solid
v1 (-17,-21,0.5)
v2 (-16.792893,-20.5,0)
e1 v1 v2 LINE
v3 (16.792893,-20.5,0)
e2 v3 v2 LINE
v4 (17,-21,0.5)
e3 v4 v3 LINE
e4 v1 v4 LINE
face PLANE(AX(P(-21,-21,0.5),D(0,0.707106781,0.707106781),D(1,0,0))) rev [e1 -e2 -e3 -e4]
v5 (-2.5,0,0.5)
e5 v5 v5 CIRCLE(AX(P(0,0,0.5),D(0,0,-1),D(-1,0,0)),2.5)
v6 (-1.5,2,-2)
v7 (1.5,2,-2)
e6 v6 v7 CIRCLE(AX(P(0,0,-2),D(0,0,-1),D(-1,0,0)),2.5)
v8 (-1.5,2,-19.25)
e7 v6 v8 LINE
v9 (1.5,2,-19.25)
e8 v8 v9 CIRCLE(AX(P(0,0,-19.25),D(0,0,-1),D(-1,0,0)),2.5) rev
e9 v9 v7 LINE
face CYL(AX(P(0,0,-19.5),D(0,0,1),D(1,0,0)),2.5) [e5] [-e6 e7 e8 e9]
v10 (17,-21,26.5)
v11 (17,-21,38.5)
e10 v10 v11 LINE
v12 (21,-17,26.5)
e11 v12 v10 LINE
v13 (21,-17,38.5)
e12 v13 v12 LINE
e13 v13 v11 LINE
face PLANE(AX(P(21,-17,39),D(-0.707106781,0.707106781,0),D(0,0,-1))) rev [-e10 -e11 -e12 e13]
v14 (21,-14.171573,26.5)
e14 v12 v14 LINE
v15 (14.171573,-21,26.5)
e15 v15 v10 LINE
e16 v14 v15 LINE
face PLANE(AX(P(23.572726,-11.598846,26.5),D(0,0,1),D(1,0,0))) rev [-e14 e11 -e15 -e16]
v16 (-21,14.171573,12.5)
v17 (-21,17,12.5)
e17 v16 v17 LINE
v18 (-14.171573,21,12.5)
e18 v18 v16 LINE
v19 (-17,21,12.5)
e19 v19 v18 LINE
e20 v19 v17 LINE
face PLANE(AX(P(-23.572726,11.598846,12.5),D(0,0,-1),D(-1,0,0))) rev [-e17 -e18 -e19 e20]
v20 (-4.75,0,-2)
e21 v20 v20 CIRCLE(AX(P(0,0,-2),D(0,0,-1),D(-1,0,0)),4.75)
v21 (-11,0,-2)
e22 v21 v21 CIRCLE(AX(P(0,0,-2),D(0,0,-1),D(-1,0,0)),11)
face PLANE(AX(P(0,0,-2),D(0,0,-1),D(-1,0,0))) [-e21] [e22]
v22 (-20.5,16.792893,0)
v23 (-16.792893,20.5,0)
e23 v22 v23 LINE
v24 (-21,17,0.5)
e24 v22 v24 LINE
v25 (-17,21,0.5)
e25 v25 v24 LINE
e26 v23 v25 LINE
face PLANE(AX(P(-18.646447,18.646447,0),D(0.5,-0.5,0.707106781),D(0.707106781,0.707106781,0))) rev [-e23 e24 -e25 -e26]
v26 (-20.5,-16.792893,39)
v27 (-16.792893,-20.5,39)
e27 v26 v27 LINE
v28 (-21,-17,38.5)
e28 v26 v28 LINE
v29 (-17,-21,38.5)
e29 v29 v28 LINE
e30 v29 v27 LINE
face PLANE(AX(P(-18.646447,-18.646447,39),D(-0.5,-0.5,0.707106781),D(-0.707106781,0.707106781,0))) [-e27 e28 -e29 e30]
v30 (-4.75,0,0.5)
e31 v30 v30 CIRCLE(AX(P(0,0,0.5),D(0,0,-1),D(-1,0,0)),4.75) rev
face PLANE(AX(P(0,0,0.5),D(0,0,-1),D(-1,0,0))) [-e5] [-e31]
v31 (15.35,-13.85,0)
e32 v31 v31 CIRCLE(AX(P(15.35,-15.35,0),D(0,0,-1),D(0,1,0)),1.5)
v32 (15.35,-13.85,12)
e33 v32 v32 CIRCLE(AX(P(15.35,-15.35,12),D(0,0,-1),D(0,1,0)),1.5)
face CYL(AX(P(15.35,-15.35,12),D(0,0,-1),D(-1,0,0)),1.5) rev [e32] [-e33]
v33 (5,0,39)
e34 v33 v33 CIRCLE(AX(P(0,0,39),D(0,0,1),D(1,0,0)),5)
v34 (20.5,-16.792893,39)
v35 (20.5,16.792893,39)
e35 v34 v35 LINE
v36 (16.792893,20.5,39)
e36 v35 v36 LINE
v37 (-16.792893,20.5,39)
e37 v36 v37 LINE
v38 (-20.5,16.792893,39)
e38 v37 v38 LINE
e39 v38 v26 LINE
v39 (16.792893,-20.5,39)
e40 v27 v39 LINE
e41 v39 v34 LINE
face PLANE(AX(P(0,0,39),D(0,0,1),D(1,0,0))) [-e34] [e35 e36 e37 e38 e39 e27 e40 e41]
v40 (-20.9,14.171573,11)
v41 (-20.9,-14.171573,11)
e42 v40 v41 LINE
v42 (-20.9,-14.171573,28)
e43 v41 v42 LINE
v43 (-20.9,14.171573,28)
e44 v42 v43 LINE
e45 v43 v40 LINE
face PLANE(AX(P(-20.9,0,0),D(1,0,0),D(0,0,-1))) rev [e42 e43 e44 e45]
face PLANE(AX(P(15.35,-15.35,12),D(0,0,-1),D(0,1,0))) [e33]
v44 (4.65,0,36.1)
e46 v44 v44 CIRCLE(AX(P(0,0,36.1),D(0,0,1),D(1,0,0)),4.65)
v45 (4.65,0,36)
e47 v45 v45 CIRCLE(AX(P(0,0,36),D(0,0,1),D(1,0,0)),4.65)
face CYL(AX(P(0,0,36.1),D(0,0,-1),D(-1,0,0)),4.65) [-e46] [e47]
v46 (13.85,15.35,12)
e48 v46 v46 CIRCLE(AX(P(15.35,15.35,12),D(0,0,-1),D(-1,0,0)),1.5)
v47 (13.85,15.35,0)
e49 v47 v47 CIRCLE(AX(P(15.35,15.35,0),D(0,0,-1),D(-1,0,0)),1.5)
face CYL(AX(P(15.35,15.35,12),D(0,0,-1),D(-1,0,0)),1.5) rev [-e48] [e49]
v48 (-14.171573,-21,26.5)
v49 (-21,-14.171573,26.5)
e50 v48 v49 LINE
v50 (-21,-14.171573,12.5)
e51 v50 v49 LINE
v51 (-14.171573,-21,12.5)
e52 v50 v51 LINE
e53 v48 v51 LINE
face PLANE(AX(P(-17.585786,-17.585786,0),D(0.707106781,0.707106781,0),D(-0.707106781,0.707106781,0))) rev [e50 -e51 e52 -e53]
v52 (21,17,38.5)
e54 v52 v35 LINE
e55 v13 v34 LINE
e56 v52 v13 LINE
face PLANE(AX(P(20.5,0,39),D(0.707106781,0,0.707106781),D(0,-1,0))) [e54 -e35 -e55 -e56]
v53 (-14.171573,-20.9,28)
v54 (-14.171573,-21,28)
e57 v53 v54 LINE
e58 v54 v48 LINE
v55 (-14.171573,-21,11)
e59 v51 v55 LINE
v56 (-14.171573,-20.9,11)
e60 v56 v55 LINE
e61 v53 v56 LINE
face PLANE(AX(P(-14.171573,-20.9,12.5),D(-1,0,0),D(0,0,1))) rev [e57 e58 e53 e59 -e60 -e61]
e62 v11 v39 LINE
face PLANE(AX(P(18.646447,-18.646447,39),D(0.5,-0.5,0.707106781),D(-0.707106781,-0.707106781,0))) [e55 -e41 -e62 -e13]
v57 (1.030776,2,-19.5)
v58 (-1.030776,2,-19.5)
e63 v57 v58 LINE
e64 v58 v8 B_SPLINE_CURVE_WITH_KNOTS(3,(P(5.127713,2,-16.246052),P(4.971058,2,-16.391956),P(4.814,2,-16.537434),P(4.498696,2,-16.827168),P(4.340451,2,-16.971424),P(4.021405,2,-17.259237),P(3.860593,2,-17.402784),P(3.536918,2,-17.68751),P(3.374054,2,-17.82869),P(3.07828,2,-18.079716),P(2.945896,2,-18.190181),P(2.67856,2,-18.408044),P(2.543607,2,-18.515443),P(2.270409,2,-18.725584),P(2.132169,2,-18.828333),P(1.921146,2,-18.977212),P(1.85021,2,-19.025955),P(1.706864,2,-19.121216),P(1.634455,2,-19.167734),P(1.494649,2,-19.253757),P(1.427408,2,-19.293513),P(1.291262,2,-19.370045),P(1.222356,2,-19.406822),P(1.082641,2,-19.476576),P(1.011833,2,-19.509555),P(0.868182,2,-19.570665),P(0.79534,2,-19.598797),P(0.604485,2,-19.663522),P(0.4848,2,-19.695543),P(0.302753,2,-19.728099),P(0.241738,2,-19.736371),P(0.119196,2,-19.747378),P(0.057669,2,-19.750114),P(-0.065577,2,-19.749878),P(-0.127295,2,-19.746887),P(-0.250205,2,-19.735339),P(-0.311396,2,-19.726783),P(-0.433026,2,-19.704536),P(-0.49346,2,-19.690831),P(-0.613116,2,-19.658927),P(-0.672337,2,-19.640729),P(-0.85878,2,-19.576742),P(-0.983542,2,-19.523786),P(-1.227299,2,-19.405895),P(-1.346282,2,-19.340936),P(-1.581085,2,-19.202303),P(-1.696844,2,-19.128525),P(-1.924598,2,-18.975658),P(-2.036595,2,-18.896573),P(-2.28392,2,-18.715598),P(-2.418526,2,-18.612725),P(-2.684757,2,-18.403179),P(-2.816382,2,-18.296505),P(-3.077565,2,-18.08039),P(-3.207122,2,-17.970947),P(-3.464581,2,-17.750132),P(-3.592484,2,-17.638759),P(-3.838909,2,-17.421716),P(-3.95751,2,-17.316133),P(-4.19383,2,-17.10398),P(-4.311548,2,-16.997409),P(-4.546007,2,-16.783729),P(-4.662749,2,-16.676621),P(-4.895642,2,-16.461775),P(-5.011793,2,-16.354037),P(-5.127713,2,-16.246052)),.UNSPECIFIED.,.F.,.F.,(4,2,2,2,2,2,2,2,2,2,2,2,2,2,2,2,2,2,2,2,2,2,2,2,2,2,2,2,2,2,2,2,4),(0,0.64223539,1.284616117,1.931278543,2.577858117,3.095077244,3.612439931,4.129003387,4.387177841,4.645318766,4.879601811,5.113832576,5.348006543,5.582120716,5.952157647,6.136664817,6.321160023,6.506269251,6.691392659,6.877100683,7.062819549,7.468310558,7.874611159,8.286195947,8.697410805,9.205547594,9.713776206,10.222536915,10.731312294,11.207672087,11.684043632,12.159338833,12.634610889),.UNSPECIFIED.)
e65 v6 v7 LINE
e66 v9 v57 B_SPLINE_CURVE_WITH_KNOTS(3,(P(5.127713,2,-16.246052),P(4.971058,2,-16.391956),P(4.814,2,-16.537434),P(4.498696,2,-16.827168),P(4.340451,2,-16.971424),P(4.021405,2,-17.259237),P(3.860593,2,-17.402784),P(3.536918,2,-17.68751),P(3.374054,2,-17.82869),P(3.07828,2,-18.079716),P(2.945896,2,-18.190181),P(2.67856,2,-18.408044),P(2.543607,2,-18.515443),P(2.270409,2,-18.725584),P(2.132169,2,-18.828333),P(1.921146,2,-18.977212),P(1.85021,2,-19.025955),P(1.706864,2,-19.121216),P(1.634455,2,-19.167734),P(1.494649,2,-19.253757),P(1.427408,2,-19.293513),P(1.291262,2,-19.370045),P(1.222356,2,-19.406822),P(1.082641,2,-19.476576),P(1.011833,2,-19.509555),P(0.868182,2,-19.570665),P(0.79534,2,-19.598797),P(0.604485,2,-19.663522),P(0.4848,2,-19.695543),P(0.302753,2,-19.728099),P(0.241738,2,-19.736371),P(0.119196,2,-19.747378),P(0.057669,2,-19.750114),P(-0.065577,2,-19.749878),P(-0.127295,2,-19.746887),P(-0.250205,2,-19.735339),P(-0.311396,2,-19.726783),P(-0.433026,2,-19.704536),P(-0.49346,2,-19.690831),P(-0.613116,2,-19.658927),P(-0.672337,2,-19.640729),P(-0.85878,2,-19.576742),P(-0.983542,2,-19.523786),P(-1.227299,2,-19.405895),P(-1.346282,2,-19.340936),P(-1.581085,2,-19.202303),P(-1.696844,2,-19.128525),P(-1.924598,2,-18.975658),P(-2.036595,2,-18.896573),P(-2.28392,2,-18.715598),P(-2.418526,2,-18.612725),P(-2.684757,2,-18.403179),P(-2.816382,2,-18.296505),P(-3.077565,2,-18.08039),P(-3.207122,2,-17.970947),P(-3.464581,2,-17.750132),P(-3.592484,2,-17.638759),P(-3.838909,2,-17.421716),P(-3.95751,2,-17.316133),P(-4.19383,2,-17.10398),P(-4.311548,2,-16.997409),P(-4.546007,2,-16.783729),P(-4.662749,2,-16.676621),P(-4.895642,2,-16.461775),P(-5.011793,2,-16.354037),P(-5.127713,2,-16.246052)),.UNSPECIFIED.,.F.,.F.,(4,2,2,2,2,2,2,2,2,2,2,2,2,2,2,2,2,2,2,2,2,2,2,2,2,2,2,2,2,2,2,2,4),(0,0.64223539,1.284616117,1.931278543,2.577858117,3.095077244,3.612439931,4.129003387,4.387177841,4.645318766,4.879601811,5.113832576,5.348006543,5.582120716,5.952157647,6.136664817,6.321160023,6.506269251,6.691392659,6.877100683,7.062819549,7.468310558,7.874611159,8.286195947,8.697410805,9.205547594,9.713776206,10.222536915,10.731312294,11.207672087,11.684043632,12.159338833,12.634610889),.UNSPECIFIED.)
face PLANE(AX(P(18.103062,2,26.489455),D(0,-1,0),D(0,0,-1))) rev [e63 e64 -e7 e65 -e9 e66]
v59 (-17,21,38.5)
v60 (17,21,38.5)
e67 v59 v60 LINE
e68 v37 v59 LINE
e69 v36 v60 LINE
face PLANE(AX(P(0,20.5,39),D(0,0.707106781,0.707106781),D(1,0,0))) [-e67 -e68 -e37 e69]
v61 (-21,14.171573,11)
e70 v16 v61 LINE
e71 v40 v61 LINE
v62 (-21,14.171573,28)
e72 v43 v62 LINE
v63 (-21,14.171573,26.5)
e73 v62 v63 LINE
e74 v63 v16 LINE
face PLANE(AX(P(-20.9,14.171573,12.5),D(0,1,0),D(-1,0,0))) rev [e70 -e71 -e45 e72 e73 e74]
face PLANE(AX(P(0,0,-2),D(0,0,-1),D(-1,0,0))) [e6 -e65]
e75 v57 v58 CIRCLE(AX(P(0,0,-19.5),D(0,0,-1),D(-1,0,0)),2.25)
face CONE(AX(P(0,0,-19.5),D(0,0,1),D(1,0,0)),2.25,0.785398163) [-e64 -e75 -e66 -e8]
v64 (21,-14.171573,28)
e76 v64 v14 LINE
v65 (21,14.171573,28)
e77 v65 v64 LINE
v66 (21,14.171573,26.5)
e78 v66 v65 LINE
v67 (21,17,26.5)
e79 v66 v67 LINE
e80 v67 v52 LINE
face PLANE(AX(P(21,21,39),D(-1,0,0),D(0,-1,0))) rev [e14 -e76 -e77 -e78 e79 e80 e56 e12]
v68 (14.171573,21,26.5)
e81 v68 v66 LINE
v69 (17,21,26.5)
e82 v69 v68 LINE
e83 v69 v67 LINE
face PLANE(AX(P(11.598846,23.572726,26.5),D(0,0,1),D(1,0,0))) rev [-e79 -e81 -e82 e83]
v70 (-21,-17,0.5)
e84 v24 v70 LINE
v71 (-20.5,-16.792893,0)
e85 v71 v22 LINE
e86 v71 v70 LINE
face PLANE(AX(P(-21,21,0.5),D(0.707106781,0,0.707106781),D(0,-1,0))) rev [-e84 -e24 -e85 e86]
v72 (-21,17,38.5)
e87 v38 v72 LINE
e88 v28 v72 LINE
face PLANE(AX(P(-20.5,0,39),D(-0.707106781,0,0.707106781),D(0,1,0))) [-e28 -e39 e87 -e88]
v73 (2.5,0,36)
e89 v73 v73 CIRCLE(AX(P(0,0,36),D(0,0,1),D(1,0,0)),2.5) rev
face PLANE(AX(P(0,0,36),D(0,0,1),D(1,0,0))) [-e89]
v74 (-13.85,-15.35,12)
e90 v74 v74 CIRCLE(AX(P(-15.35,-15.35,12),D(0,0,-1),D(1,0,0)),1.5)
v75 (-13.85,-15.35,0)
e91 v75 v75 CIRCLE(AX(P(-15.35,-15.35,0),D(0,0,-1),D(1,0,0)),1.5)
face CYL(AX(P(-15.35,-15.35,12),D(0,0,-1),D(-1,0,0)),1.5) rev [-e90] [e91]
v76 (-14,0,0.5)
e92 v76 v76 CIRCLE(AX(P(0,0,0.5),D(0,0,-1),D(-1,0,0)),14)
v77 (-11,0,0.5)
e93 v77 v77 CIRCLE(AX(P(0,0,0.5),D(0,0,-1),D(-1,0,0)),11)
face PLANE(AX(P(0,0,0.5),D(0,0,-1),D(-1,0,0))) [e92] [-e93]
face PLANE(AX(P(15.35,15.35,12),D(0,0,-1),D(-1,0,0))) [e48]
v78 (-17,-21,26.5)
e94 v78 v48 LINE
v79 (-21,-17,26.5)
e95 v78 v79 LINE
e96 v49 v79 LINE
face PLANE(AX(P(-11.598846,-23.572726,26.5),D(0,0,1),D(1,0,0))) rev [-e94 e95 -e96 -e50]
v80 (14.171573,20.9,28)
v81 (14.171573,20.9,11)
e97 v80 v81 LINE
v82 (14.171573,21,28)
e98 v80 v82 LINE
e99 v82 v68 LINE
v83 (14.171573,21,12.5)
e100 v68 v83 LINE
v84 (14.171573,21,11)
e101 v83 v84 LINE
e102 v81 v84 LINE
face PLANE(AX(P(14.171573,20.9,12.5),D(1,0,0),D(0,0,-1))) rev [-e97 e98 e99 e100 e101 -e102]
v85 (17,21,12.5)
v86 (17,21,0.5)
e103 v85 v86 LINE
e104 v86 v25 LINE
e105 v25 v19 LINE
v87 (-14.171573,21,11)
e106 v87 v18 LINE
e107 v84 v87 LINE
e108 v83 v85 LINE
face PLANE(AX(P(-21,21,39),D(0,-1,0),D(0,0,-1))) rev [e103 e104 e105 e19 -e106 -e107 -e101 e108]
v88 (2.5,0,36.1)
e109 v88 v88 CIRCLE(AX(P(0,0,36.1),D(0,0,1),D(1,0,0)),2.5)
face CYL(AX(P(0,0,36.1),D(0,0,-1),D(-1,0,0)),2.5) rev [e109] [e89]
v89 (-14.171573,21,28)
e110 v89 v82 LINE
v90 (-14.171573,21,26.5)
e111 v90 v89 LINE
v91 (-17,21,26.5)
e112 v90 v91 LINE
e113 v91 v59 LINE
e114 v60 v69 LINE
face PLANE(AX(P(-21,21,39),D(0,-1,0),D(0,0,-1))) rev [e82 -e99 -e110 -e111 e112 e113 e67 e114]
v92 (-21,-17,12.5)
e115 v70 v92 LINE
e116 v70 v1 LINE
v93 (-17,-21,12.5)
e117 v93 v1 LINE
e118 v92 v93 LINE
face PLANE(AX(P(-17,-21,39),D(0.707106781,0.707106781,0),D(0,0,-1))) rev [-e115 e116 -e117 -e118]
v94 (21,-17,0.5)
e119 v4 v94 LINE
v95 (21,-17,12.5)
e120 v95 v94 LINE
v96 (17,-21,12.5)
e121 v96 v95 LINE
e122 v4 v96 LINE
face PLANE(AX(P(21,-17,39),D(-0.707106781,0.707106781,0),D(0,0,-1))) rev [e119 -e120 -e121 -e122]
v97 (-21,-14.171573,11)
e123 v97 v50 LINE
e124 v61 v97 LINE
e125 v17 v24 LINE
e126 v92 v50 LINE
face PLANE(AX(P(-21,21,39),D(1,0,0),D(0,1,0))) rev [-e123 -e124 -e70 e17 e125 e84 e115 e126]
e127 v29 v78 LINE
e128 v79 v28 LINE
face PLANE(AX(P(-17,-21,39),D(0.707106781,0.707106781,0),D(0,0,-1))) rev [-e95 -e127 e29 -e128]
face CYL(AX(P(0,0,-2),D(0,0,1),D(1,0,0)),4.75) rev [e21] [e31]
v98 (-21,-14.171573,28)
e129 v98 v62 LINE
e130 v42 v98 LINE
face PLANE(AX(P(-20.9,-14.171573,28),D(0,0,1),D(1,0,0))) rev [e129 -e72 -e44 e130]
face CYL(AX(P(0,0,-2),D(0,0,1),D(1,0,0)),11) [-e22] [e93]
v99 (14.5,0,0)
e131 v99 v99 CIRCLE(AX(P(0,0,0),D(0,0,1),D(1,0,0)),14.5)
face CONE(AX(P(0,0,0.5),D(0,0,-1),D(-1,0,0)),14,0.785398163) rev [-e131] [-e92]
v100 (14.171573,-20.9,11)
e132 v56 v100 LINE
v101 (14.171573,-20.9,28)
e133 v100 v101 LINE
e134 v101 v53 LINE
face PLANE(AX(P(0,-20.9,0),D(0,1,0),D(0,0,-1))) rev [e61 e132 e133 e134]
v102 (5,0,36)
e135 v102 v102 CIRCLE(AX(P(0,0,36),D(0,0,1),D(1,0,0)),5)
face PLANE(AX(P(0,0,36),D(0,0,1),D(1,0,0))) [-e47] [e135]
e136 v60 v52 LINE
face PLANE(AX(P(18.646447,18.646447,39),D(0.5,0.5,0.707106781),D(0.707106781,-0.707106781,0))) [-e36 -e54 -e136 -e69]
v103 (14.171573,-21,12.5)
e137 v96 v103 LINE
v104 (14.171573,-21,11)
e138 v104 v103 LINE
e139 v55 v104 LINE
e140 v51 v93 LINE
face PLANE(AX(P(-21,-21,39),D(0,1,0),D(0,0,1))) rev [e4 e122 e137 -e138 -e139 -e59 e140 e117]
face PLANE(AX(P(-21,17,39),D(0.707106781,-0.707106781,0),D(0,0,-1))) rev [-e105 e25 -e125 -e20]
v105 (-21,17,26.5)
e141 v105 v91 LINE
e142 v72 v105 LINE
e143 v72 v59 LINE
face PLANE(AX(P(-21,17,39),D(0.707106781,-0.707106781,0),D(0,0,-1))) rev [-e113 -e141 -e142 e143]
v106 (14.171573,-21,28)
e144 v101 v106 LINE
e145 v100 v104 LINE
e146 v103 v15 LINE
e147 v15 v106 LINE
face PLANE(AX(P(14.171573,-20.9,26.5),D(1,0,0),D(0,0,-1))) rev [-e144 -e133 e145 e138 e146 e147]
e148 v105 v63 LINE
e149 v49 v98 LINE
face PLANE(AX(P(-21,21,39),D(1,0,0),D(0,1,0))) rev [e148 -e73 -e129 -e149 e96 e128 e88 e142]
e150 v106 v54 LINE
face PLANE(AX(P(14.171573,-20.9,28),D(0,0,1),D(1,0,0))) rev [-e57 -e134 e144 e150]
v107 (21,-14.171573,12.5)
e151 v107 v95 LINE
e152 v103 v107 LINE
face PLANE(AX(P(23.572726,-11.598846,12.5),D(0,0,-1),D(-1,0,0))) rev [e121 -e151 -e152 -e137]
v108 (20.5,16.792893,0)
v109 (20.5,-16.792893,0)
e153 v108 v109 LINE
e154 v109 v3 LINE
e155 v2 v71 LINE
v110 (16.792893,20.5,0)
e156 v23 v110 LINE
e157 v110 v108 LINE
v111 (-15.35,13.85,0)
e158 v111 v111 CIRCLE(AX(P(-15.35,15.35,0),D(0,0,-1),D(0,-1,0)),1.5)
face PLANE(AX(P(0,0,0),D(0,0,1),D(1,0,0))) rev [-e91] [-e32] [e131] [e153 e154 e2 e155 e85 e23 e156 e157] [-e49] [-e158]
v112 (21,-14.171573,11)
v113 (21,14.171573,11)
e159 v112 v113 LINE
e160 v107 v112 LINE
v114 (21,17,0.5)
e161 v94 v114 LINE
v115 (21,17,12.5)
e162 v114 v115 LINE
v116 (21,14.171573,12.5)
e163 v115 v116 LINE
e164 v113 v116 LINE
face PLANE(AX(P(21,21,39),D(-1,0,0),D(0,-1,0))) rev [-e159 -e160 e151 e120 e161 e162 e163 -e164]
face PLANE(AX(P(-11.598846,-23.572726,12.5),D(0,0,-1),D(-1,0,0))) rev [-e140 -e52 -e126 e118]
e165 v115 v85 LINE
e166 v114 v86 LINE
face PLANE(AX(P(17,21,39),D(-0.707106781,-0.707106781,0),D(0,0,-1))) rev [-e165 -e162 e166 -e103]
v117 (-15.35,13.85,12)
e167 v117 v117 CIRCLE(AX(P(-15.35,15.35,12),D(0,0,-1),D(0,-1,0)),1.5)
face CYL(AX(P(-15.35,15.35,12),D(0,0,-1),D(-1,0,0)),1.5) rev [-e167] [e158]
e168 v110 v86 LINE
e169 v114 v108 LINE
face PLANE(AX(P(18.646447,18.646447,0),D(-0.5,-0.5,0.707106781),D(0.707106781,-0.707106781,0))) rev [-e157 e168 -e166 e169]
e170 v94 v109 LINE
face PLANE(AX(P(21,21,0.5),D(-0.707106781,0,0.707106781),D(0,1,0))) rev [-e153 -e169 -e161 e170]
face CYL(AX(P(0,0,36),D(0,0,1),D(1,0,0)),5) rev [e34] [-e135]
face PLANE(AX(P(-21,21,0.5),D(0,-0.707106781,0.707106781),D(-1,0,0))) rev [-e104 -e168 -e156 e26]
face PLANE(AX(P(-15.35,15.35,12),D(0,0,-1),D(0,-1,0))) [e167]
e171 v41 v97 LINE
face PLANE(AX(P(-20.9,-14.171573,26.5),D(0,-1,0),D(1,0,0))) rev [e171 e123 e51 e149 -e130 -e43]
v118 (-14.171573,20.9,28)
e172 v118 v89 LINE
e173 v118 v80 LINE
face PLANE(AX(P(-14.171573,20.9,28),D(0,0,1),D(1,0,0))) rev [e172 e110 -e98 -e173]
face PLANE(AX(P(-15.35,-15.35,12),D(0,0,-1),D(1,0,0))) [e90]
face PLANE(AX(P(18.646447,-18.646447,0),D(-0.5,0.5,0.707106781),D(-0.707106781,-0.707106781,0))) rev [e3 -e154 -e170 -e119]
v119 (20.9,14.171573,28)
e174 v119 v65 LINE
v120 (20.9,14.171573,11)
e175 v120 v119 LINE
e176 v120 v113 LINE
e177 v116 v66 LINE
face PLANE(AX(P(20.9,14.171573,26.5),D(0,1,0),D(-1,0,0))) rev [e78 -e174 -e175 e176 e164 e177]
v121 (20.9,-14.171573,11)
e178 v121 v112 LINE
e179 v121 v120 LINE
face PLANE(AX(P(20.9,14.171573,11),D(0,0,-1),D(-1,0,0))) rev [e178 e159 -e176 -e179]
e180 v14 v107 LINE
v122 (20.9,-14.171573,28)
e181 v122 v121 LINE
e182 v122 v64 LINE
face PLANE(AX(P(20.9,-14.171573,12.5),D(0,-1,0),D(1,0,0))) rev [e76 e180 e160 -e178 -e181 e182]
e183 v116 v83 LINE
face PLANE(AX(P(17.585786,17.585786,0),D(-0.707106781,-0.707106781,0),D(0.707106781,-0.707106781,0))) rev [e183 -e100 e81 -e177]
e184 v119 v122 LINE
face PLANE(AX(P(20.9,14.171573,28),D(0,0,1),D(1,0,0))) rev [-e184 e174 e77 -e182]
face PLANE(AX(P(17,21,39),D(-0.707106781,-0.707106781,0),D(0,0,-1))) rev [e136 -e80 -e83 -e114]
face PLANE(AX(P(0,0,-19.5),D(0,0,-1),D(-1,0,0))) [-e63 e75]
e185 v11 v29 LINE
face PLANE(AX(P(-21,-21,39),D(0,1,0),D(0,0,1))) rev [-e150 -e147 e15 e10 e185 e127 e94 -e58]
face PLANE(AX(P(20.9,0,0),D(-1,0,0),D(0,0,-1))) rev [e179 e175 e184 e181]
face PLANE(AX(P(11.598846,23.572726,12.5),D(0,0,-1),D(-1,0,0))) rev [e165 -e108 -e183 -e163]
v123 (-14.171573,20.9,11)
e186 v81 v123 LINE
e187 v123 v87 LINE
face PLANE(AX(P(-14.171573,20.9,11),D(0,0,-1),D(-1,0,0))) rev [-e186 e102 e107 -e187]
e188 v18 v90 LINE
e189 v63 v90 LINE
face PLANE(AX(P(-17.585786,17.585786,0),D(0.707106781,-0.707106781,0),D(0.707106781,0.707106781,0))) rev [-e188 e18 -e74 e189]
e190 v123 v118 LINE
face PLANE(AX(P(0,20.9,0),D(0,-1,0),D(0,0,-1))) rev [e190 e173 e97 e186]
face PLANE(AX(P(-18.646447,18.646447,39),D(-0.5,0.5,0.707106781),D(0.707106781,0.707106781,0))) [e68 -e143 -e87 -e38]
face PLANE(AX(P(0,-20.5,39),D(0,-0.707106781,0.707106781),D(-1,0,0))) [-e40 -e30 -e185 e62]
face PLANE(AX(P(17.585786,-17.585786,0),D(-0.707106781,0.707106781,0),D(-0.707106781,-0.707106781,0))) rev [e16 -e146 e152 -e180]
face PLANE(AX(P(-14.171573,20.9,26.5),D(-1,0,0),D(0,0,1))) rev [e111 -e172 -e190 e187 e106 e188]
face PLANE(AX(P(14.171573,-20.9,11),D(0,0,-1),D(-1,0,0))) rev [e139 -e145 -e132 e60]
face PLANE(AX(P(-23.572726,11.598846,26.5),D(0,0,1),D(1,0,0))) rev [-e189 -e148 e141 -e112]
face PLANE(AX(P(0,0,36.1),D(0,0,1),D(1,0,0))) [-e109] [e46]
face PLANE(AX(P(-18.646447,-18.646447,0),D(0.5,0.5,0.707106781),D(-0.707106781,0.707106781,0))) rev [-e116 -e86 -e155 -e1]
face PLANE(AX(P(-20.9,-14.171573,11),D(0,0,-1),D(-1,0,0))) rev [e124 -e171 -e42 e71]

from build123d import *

# Parameters (mm, degrees)
CROQUIS1_W              = 42
CROQUIS1_H              = 42
SALIENTE_EXTRUIR1_DEPTH = 39
CHAFL_N2_SIZE           = 4
CHAFL_N3_SIZE           = 0.5
CROQUIS2_R              = 15
CORTAR_EXTRUIR2_DEPTH   = 0.5
CHAFL_N4_SIZE           = 1
CROQUIS3_R              = 11
CROQUIS3_R_2            = 4.75
SALIENTE_EXTRUIR2_DEPTH = 2.5
CROQUIS4_R              = 2.5
SALIENTE_EXTRUIR3_DEPTH = 20
CHAFL_N5_SIZE           = 0.25
CROQUIS5_W              = 26.553784045
CROQUIS5_H              = 10.322094095
CORTAR_EXTRUIR3_DEPTH   = 17.5
CROQUIS6_R              = 1.5
CORTAR_EXTRUIR4_DEPTH   = 12
MATRIZC1_COUNT          = 4
CROQUIS7_W              = 14
CROQUIS7_H              = 16.933623344
CORTAR_EXTRUIR5_DEPTH   = 2
MATRIZC2_COUNT          = 4
CORTAR_EXTRUIR6_DEPTH   = 0.1
MATRIZC3_COUNT          = 4
CROQUIS9_R              = 5
CORTAR_EXTRUIR7_DEPTH   = 3
SALIENTE_EXTRUIR4_START = 0.1
CROQUIS10_R             = 4.65
CROQUIS10_R_2           = 2.5
SALIENTE_EXTRUIR4_DEPTH = 0.1


with BuildPart() as part:
    # Croquis1 → Saliente-Extruir1 (new body)
    with BuildSketch(Plane.XY):
        Rectangle(CROQUIS1_W, CROQUIS1_H)
    extrude(amount=SALIENTE_EXTRUIR1_DEPTH)

    # Chaflán2
    chafl_n2_edges = [part.edges().sort_by_distance(p)[0] for p in [
        (21, -21, 19.5),
        (-21, -21, 19.5),
        (-21, 21, 19.5),
        (21, 21, 19.5),
    ]]
    chamfer(chafl_n2_edges, length=CHAFL_N2_SIZE)

    # Chaflán3
    chafl_n3_edges = [part.edges().sort_by_distance(p)[0] for p in [
        (21, 0, 0),
        (21, 0, 39),
        (0, -21, 0),
        (-21, 0, 0),
        (0, 21, 0),
        (-19, -19, 0),
        (-19, 19, 0),
        (19, 19, 0),
        (19, -19, 0),
        (0, -21, 39),
        (0, 21, 39),
        (-21, 0, 39),
        (-19, -19, 39),
        (-19, 19, 39),
        (19, 19, 39),
        (19, -19, 39),
    ]]
    chamfer(chafl_n3_edges, length=CHAFL_N3_SIZE)

    # Croquis2 → Cortar-Extruir2 (cut)
    with BuildSketch(Plane(origin=(0, 0, 0), x_dir=(-1, 0, 0), z_dir=(0, 0, -1))):
        Circle(CROQUIS2_R)
    extrude(amount=-CORTAR_EXTRUIR2_DEPTH, mode=Mode.SUBTRACT)

    # Chaflán4
    # the kernel refuses this chamfer: 1 mm, written as the material it adds along each edge
    with BuildSketch(Plane(origin=(0, 0, 0.5), x_dir=(-1, 0, 0), z_dir=(0, -1, 0))) as chafl_n4_piece_1_section:
        Polygon((15, CHAFL_N4_SIZE), (15 - CHAFL_N4_SIZE, 0), (15, 0), align=None)
    chafl_n4_piece_1 = revolve(axis=Axis((0, 0, 0.5), (0, 0, -1)), mode=Mode.PRIVATE)
    chafl_n4_piece_1 = split(chafl_n4_piece_1, bisect_by=Plane(origin=(14.259533629, 0, 0), z_dir=(0, 0, 1)), keep=Keep.TOP, mode=Mode.PRIVATE)
    add(chafl_n4_piece_1)

    # Croquis3 → Saliente-Extruir2 (add)
    with BuildSketch(Plane(origin=(0, 0, 0.5), x_dir=(-1, 0, 0), z_dir=(0, 0, -1))):
        Circle(CROQUIS3_R)
        Circle(CROQUIS3_R_2, mode=Mode.SUBTRACT)
    extrude(amount=SALIENTE_EXTRUIR2_DEPTH)

    # Croquis4 → Saliente-Extruir3 (add)
    with BuildSketch(Plane(origin=(0, 0, 0.5), x_dir=(-1, 0, 0), z_dir=(0, 0, -1))):
        Circle(CROQUIS4_R)
    extrude(amount=SALIENTE_EXTRUIR3_DEPTH)

    # Chaflán5
    chafl_n5_edges = [part.edges().sort_by_distance(p)[0] for p in [
        (2.5, 0, -19.5),
    ]]
    chamfer(chafl_n5_edges, length=CHAFL_N5_SIZE)

    # Croquis5 → Cortar-Extruir3 (cut)
    with BuildSketch(Plane(origin=(0, 0, -19.5), x_dir=(-1, 0, 0), z_dir=(0, 0, -1))):
        with Locations((-4.826169949, 7.161047048)):
            Rectangle(CROQUIS5_W, CROQUIS5_H)
    extrude(amount=-CORTAR_EXTRUIR3_DEPTH, mode=Mode.SUBTRACT)

    # Croquis6 → Cortar-Extruir4 (cut)
    with BuildSketch(Plane(origin=(0, 0, 0), x_dir=(-1, 0, 0), z_dir=(0, 0, -1))):
        with Locations((-15.35, 15.35)):
            Circle(CROQUIS6_R)
    cortar_extruir4 = extrude(amount=-CORTAR_EXTRUIR4_DEPTH, mode=Mode.SUBTRACT)

    # MatrizC1: Cortar-Extruir4 ×4 about axis
    matrizc1_axis = Axis((0, 0, 0), (0, 0, 1))
    for i in range(1, MATRIZC1_COUNT):
        add(cortar_extruir4.rotate(matrizc1_axis, i * 360 / MATRIZC1_COUNT), mode=Mode.SUBTRACT)

    # Croquis7 → Cortar-Extruir5 (cut)
    with BuildSketch(Plane(origin=(-19, -19, 0), x_dir=(0, 0, 1), z_dir=(-0.7071067811865487, -0.7071067811865465, 0))):
        with Locations((19.5, 0)):
            Rectangle(CROQUIS7_W, CROQUIS7_H)
    cortar_extruir5 = extrude(amount=-CORTAR_EXTRUIR5_DEPTH, mode=Mode.SUBTRACT)

    # MatrizC2: Cortar-Extruir5 ×4 about axis
    matrizc2_axis = Axis((0, 0, 0), (0, 0, 1))
    for i in range(1, MATRIZC2_COUNT):
        add(cortar_extruir5.rotate(matrizc2_axis, i * 360 / MATRIZC2_COUNT), mode=Mode.SUBTRACT)

    # Croquis8 → Cortar-Extruir6 (cut)
    with BuildSketch(Plane(origin=(0, 21, 0), x_dir=(1, 0, 0), z_dir=(0, 1, 0))):
        Polygon((-14.171572875, -12.5), (-14.171572875, -26.5), (-14.171572875, -28), (14.171572875, -28), (14.171572875, -26.5), (14.171572875, -12.5), (14.171572875, -11), (-14.171572875, -11), align=None)
    cortar_extruir6 = extrude(amount=-CORTAR_EXTRUIR6_DEPTH, mode=Mode.SUBTRACT)

    # MatrizC3: Cortar-Extruir6 ×4 about axis
    matrizc3_axis = Axis((0, 0, 0), (0, 0, 1))
    for i in range(1, MATRIZC3_COUNT):
        add(cortar_extruir6.rotate(matrizc3_axis, i * 360 / MATRIZC3_COUNT), mode=Mode.SUBTRACT)

    # Croquis9 → Cortar-Extruir7 (cut)
    with BuildSketch(Plane.XY.offset(39)):
        Circle(CROQUIS9_R)
    extrude(amount=-CORTAR_EXTRUIR7_DEPTH, mode=Mode.SUBTRACT)

    # Croquis10 → Saliente-Extruir4 (add)
    with BuildSketch(Plane.XY.offset(36).offset(SALIENTE_EXTRUIR4_START)):
        Circle(CROQUIS10_R)
        with Locations(Location((0, 0, 0), (0, 0, 53.130102354))):
            Circle(CROQUIS10_R_2, mode=Mode.SUBTRACT)
    extrude(amount=-SALIENTE_EXTRUIR4_DEPTH)


solid = part.part
